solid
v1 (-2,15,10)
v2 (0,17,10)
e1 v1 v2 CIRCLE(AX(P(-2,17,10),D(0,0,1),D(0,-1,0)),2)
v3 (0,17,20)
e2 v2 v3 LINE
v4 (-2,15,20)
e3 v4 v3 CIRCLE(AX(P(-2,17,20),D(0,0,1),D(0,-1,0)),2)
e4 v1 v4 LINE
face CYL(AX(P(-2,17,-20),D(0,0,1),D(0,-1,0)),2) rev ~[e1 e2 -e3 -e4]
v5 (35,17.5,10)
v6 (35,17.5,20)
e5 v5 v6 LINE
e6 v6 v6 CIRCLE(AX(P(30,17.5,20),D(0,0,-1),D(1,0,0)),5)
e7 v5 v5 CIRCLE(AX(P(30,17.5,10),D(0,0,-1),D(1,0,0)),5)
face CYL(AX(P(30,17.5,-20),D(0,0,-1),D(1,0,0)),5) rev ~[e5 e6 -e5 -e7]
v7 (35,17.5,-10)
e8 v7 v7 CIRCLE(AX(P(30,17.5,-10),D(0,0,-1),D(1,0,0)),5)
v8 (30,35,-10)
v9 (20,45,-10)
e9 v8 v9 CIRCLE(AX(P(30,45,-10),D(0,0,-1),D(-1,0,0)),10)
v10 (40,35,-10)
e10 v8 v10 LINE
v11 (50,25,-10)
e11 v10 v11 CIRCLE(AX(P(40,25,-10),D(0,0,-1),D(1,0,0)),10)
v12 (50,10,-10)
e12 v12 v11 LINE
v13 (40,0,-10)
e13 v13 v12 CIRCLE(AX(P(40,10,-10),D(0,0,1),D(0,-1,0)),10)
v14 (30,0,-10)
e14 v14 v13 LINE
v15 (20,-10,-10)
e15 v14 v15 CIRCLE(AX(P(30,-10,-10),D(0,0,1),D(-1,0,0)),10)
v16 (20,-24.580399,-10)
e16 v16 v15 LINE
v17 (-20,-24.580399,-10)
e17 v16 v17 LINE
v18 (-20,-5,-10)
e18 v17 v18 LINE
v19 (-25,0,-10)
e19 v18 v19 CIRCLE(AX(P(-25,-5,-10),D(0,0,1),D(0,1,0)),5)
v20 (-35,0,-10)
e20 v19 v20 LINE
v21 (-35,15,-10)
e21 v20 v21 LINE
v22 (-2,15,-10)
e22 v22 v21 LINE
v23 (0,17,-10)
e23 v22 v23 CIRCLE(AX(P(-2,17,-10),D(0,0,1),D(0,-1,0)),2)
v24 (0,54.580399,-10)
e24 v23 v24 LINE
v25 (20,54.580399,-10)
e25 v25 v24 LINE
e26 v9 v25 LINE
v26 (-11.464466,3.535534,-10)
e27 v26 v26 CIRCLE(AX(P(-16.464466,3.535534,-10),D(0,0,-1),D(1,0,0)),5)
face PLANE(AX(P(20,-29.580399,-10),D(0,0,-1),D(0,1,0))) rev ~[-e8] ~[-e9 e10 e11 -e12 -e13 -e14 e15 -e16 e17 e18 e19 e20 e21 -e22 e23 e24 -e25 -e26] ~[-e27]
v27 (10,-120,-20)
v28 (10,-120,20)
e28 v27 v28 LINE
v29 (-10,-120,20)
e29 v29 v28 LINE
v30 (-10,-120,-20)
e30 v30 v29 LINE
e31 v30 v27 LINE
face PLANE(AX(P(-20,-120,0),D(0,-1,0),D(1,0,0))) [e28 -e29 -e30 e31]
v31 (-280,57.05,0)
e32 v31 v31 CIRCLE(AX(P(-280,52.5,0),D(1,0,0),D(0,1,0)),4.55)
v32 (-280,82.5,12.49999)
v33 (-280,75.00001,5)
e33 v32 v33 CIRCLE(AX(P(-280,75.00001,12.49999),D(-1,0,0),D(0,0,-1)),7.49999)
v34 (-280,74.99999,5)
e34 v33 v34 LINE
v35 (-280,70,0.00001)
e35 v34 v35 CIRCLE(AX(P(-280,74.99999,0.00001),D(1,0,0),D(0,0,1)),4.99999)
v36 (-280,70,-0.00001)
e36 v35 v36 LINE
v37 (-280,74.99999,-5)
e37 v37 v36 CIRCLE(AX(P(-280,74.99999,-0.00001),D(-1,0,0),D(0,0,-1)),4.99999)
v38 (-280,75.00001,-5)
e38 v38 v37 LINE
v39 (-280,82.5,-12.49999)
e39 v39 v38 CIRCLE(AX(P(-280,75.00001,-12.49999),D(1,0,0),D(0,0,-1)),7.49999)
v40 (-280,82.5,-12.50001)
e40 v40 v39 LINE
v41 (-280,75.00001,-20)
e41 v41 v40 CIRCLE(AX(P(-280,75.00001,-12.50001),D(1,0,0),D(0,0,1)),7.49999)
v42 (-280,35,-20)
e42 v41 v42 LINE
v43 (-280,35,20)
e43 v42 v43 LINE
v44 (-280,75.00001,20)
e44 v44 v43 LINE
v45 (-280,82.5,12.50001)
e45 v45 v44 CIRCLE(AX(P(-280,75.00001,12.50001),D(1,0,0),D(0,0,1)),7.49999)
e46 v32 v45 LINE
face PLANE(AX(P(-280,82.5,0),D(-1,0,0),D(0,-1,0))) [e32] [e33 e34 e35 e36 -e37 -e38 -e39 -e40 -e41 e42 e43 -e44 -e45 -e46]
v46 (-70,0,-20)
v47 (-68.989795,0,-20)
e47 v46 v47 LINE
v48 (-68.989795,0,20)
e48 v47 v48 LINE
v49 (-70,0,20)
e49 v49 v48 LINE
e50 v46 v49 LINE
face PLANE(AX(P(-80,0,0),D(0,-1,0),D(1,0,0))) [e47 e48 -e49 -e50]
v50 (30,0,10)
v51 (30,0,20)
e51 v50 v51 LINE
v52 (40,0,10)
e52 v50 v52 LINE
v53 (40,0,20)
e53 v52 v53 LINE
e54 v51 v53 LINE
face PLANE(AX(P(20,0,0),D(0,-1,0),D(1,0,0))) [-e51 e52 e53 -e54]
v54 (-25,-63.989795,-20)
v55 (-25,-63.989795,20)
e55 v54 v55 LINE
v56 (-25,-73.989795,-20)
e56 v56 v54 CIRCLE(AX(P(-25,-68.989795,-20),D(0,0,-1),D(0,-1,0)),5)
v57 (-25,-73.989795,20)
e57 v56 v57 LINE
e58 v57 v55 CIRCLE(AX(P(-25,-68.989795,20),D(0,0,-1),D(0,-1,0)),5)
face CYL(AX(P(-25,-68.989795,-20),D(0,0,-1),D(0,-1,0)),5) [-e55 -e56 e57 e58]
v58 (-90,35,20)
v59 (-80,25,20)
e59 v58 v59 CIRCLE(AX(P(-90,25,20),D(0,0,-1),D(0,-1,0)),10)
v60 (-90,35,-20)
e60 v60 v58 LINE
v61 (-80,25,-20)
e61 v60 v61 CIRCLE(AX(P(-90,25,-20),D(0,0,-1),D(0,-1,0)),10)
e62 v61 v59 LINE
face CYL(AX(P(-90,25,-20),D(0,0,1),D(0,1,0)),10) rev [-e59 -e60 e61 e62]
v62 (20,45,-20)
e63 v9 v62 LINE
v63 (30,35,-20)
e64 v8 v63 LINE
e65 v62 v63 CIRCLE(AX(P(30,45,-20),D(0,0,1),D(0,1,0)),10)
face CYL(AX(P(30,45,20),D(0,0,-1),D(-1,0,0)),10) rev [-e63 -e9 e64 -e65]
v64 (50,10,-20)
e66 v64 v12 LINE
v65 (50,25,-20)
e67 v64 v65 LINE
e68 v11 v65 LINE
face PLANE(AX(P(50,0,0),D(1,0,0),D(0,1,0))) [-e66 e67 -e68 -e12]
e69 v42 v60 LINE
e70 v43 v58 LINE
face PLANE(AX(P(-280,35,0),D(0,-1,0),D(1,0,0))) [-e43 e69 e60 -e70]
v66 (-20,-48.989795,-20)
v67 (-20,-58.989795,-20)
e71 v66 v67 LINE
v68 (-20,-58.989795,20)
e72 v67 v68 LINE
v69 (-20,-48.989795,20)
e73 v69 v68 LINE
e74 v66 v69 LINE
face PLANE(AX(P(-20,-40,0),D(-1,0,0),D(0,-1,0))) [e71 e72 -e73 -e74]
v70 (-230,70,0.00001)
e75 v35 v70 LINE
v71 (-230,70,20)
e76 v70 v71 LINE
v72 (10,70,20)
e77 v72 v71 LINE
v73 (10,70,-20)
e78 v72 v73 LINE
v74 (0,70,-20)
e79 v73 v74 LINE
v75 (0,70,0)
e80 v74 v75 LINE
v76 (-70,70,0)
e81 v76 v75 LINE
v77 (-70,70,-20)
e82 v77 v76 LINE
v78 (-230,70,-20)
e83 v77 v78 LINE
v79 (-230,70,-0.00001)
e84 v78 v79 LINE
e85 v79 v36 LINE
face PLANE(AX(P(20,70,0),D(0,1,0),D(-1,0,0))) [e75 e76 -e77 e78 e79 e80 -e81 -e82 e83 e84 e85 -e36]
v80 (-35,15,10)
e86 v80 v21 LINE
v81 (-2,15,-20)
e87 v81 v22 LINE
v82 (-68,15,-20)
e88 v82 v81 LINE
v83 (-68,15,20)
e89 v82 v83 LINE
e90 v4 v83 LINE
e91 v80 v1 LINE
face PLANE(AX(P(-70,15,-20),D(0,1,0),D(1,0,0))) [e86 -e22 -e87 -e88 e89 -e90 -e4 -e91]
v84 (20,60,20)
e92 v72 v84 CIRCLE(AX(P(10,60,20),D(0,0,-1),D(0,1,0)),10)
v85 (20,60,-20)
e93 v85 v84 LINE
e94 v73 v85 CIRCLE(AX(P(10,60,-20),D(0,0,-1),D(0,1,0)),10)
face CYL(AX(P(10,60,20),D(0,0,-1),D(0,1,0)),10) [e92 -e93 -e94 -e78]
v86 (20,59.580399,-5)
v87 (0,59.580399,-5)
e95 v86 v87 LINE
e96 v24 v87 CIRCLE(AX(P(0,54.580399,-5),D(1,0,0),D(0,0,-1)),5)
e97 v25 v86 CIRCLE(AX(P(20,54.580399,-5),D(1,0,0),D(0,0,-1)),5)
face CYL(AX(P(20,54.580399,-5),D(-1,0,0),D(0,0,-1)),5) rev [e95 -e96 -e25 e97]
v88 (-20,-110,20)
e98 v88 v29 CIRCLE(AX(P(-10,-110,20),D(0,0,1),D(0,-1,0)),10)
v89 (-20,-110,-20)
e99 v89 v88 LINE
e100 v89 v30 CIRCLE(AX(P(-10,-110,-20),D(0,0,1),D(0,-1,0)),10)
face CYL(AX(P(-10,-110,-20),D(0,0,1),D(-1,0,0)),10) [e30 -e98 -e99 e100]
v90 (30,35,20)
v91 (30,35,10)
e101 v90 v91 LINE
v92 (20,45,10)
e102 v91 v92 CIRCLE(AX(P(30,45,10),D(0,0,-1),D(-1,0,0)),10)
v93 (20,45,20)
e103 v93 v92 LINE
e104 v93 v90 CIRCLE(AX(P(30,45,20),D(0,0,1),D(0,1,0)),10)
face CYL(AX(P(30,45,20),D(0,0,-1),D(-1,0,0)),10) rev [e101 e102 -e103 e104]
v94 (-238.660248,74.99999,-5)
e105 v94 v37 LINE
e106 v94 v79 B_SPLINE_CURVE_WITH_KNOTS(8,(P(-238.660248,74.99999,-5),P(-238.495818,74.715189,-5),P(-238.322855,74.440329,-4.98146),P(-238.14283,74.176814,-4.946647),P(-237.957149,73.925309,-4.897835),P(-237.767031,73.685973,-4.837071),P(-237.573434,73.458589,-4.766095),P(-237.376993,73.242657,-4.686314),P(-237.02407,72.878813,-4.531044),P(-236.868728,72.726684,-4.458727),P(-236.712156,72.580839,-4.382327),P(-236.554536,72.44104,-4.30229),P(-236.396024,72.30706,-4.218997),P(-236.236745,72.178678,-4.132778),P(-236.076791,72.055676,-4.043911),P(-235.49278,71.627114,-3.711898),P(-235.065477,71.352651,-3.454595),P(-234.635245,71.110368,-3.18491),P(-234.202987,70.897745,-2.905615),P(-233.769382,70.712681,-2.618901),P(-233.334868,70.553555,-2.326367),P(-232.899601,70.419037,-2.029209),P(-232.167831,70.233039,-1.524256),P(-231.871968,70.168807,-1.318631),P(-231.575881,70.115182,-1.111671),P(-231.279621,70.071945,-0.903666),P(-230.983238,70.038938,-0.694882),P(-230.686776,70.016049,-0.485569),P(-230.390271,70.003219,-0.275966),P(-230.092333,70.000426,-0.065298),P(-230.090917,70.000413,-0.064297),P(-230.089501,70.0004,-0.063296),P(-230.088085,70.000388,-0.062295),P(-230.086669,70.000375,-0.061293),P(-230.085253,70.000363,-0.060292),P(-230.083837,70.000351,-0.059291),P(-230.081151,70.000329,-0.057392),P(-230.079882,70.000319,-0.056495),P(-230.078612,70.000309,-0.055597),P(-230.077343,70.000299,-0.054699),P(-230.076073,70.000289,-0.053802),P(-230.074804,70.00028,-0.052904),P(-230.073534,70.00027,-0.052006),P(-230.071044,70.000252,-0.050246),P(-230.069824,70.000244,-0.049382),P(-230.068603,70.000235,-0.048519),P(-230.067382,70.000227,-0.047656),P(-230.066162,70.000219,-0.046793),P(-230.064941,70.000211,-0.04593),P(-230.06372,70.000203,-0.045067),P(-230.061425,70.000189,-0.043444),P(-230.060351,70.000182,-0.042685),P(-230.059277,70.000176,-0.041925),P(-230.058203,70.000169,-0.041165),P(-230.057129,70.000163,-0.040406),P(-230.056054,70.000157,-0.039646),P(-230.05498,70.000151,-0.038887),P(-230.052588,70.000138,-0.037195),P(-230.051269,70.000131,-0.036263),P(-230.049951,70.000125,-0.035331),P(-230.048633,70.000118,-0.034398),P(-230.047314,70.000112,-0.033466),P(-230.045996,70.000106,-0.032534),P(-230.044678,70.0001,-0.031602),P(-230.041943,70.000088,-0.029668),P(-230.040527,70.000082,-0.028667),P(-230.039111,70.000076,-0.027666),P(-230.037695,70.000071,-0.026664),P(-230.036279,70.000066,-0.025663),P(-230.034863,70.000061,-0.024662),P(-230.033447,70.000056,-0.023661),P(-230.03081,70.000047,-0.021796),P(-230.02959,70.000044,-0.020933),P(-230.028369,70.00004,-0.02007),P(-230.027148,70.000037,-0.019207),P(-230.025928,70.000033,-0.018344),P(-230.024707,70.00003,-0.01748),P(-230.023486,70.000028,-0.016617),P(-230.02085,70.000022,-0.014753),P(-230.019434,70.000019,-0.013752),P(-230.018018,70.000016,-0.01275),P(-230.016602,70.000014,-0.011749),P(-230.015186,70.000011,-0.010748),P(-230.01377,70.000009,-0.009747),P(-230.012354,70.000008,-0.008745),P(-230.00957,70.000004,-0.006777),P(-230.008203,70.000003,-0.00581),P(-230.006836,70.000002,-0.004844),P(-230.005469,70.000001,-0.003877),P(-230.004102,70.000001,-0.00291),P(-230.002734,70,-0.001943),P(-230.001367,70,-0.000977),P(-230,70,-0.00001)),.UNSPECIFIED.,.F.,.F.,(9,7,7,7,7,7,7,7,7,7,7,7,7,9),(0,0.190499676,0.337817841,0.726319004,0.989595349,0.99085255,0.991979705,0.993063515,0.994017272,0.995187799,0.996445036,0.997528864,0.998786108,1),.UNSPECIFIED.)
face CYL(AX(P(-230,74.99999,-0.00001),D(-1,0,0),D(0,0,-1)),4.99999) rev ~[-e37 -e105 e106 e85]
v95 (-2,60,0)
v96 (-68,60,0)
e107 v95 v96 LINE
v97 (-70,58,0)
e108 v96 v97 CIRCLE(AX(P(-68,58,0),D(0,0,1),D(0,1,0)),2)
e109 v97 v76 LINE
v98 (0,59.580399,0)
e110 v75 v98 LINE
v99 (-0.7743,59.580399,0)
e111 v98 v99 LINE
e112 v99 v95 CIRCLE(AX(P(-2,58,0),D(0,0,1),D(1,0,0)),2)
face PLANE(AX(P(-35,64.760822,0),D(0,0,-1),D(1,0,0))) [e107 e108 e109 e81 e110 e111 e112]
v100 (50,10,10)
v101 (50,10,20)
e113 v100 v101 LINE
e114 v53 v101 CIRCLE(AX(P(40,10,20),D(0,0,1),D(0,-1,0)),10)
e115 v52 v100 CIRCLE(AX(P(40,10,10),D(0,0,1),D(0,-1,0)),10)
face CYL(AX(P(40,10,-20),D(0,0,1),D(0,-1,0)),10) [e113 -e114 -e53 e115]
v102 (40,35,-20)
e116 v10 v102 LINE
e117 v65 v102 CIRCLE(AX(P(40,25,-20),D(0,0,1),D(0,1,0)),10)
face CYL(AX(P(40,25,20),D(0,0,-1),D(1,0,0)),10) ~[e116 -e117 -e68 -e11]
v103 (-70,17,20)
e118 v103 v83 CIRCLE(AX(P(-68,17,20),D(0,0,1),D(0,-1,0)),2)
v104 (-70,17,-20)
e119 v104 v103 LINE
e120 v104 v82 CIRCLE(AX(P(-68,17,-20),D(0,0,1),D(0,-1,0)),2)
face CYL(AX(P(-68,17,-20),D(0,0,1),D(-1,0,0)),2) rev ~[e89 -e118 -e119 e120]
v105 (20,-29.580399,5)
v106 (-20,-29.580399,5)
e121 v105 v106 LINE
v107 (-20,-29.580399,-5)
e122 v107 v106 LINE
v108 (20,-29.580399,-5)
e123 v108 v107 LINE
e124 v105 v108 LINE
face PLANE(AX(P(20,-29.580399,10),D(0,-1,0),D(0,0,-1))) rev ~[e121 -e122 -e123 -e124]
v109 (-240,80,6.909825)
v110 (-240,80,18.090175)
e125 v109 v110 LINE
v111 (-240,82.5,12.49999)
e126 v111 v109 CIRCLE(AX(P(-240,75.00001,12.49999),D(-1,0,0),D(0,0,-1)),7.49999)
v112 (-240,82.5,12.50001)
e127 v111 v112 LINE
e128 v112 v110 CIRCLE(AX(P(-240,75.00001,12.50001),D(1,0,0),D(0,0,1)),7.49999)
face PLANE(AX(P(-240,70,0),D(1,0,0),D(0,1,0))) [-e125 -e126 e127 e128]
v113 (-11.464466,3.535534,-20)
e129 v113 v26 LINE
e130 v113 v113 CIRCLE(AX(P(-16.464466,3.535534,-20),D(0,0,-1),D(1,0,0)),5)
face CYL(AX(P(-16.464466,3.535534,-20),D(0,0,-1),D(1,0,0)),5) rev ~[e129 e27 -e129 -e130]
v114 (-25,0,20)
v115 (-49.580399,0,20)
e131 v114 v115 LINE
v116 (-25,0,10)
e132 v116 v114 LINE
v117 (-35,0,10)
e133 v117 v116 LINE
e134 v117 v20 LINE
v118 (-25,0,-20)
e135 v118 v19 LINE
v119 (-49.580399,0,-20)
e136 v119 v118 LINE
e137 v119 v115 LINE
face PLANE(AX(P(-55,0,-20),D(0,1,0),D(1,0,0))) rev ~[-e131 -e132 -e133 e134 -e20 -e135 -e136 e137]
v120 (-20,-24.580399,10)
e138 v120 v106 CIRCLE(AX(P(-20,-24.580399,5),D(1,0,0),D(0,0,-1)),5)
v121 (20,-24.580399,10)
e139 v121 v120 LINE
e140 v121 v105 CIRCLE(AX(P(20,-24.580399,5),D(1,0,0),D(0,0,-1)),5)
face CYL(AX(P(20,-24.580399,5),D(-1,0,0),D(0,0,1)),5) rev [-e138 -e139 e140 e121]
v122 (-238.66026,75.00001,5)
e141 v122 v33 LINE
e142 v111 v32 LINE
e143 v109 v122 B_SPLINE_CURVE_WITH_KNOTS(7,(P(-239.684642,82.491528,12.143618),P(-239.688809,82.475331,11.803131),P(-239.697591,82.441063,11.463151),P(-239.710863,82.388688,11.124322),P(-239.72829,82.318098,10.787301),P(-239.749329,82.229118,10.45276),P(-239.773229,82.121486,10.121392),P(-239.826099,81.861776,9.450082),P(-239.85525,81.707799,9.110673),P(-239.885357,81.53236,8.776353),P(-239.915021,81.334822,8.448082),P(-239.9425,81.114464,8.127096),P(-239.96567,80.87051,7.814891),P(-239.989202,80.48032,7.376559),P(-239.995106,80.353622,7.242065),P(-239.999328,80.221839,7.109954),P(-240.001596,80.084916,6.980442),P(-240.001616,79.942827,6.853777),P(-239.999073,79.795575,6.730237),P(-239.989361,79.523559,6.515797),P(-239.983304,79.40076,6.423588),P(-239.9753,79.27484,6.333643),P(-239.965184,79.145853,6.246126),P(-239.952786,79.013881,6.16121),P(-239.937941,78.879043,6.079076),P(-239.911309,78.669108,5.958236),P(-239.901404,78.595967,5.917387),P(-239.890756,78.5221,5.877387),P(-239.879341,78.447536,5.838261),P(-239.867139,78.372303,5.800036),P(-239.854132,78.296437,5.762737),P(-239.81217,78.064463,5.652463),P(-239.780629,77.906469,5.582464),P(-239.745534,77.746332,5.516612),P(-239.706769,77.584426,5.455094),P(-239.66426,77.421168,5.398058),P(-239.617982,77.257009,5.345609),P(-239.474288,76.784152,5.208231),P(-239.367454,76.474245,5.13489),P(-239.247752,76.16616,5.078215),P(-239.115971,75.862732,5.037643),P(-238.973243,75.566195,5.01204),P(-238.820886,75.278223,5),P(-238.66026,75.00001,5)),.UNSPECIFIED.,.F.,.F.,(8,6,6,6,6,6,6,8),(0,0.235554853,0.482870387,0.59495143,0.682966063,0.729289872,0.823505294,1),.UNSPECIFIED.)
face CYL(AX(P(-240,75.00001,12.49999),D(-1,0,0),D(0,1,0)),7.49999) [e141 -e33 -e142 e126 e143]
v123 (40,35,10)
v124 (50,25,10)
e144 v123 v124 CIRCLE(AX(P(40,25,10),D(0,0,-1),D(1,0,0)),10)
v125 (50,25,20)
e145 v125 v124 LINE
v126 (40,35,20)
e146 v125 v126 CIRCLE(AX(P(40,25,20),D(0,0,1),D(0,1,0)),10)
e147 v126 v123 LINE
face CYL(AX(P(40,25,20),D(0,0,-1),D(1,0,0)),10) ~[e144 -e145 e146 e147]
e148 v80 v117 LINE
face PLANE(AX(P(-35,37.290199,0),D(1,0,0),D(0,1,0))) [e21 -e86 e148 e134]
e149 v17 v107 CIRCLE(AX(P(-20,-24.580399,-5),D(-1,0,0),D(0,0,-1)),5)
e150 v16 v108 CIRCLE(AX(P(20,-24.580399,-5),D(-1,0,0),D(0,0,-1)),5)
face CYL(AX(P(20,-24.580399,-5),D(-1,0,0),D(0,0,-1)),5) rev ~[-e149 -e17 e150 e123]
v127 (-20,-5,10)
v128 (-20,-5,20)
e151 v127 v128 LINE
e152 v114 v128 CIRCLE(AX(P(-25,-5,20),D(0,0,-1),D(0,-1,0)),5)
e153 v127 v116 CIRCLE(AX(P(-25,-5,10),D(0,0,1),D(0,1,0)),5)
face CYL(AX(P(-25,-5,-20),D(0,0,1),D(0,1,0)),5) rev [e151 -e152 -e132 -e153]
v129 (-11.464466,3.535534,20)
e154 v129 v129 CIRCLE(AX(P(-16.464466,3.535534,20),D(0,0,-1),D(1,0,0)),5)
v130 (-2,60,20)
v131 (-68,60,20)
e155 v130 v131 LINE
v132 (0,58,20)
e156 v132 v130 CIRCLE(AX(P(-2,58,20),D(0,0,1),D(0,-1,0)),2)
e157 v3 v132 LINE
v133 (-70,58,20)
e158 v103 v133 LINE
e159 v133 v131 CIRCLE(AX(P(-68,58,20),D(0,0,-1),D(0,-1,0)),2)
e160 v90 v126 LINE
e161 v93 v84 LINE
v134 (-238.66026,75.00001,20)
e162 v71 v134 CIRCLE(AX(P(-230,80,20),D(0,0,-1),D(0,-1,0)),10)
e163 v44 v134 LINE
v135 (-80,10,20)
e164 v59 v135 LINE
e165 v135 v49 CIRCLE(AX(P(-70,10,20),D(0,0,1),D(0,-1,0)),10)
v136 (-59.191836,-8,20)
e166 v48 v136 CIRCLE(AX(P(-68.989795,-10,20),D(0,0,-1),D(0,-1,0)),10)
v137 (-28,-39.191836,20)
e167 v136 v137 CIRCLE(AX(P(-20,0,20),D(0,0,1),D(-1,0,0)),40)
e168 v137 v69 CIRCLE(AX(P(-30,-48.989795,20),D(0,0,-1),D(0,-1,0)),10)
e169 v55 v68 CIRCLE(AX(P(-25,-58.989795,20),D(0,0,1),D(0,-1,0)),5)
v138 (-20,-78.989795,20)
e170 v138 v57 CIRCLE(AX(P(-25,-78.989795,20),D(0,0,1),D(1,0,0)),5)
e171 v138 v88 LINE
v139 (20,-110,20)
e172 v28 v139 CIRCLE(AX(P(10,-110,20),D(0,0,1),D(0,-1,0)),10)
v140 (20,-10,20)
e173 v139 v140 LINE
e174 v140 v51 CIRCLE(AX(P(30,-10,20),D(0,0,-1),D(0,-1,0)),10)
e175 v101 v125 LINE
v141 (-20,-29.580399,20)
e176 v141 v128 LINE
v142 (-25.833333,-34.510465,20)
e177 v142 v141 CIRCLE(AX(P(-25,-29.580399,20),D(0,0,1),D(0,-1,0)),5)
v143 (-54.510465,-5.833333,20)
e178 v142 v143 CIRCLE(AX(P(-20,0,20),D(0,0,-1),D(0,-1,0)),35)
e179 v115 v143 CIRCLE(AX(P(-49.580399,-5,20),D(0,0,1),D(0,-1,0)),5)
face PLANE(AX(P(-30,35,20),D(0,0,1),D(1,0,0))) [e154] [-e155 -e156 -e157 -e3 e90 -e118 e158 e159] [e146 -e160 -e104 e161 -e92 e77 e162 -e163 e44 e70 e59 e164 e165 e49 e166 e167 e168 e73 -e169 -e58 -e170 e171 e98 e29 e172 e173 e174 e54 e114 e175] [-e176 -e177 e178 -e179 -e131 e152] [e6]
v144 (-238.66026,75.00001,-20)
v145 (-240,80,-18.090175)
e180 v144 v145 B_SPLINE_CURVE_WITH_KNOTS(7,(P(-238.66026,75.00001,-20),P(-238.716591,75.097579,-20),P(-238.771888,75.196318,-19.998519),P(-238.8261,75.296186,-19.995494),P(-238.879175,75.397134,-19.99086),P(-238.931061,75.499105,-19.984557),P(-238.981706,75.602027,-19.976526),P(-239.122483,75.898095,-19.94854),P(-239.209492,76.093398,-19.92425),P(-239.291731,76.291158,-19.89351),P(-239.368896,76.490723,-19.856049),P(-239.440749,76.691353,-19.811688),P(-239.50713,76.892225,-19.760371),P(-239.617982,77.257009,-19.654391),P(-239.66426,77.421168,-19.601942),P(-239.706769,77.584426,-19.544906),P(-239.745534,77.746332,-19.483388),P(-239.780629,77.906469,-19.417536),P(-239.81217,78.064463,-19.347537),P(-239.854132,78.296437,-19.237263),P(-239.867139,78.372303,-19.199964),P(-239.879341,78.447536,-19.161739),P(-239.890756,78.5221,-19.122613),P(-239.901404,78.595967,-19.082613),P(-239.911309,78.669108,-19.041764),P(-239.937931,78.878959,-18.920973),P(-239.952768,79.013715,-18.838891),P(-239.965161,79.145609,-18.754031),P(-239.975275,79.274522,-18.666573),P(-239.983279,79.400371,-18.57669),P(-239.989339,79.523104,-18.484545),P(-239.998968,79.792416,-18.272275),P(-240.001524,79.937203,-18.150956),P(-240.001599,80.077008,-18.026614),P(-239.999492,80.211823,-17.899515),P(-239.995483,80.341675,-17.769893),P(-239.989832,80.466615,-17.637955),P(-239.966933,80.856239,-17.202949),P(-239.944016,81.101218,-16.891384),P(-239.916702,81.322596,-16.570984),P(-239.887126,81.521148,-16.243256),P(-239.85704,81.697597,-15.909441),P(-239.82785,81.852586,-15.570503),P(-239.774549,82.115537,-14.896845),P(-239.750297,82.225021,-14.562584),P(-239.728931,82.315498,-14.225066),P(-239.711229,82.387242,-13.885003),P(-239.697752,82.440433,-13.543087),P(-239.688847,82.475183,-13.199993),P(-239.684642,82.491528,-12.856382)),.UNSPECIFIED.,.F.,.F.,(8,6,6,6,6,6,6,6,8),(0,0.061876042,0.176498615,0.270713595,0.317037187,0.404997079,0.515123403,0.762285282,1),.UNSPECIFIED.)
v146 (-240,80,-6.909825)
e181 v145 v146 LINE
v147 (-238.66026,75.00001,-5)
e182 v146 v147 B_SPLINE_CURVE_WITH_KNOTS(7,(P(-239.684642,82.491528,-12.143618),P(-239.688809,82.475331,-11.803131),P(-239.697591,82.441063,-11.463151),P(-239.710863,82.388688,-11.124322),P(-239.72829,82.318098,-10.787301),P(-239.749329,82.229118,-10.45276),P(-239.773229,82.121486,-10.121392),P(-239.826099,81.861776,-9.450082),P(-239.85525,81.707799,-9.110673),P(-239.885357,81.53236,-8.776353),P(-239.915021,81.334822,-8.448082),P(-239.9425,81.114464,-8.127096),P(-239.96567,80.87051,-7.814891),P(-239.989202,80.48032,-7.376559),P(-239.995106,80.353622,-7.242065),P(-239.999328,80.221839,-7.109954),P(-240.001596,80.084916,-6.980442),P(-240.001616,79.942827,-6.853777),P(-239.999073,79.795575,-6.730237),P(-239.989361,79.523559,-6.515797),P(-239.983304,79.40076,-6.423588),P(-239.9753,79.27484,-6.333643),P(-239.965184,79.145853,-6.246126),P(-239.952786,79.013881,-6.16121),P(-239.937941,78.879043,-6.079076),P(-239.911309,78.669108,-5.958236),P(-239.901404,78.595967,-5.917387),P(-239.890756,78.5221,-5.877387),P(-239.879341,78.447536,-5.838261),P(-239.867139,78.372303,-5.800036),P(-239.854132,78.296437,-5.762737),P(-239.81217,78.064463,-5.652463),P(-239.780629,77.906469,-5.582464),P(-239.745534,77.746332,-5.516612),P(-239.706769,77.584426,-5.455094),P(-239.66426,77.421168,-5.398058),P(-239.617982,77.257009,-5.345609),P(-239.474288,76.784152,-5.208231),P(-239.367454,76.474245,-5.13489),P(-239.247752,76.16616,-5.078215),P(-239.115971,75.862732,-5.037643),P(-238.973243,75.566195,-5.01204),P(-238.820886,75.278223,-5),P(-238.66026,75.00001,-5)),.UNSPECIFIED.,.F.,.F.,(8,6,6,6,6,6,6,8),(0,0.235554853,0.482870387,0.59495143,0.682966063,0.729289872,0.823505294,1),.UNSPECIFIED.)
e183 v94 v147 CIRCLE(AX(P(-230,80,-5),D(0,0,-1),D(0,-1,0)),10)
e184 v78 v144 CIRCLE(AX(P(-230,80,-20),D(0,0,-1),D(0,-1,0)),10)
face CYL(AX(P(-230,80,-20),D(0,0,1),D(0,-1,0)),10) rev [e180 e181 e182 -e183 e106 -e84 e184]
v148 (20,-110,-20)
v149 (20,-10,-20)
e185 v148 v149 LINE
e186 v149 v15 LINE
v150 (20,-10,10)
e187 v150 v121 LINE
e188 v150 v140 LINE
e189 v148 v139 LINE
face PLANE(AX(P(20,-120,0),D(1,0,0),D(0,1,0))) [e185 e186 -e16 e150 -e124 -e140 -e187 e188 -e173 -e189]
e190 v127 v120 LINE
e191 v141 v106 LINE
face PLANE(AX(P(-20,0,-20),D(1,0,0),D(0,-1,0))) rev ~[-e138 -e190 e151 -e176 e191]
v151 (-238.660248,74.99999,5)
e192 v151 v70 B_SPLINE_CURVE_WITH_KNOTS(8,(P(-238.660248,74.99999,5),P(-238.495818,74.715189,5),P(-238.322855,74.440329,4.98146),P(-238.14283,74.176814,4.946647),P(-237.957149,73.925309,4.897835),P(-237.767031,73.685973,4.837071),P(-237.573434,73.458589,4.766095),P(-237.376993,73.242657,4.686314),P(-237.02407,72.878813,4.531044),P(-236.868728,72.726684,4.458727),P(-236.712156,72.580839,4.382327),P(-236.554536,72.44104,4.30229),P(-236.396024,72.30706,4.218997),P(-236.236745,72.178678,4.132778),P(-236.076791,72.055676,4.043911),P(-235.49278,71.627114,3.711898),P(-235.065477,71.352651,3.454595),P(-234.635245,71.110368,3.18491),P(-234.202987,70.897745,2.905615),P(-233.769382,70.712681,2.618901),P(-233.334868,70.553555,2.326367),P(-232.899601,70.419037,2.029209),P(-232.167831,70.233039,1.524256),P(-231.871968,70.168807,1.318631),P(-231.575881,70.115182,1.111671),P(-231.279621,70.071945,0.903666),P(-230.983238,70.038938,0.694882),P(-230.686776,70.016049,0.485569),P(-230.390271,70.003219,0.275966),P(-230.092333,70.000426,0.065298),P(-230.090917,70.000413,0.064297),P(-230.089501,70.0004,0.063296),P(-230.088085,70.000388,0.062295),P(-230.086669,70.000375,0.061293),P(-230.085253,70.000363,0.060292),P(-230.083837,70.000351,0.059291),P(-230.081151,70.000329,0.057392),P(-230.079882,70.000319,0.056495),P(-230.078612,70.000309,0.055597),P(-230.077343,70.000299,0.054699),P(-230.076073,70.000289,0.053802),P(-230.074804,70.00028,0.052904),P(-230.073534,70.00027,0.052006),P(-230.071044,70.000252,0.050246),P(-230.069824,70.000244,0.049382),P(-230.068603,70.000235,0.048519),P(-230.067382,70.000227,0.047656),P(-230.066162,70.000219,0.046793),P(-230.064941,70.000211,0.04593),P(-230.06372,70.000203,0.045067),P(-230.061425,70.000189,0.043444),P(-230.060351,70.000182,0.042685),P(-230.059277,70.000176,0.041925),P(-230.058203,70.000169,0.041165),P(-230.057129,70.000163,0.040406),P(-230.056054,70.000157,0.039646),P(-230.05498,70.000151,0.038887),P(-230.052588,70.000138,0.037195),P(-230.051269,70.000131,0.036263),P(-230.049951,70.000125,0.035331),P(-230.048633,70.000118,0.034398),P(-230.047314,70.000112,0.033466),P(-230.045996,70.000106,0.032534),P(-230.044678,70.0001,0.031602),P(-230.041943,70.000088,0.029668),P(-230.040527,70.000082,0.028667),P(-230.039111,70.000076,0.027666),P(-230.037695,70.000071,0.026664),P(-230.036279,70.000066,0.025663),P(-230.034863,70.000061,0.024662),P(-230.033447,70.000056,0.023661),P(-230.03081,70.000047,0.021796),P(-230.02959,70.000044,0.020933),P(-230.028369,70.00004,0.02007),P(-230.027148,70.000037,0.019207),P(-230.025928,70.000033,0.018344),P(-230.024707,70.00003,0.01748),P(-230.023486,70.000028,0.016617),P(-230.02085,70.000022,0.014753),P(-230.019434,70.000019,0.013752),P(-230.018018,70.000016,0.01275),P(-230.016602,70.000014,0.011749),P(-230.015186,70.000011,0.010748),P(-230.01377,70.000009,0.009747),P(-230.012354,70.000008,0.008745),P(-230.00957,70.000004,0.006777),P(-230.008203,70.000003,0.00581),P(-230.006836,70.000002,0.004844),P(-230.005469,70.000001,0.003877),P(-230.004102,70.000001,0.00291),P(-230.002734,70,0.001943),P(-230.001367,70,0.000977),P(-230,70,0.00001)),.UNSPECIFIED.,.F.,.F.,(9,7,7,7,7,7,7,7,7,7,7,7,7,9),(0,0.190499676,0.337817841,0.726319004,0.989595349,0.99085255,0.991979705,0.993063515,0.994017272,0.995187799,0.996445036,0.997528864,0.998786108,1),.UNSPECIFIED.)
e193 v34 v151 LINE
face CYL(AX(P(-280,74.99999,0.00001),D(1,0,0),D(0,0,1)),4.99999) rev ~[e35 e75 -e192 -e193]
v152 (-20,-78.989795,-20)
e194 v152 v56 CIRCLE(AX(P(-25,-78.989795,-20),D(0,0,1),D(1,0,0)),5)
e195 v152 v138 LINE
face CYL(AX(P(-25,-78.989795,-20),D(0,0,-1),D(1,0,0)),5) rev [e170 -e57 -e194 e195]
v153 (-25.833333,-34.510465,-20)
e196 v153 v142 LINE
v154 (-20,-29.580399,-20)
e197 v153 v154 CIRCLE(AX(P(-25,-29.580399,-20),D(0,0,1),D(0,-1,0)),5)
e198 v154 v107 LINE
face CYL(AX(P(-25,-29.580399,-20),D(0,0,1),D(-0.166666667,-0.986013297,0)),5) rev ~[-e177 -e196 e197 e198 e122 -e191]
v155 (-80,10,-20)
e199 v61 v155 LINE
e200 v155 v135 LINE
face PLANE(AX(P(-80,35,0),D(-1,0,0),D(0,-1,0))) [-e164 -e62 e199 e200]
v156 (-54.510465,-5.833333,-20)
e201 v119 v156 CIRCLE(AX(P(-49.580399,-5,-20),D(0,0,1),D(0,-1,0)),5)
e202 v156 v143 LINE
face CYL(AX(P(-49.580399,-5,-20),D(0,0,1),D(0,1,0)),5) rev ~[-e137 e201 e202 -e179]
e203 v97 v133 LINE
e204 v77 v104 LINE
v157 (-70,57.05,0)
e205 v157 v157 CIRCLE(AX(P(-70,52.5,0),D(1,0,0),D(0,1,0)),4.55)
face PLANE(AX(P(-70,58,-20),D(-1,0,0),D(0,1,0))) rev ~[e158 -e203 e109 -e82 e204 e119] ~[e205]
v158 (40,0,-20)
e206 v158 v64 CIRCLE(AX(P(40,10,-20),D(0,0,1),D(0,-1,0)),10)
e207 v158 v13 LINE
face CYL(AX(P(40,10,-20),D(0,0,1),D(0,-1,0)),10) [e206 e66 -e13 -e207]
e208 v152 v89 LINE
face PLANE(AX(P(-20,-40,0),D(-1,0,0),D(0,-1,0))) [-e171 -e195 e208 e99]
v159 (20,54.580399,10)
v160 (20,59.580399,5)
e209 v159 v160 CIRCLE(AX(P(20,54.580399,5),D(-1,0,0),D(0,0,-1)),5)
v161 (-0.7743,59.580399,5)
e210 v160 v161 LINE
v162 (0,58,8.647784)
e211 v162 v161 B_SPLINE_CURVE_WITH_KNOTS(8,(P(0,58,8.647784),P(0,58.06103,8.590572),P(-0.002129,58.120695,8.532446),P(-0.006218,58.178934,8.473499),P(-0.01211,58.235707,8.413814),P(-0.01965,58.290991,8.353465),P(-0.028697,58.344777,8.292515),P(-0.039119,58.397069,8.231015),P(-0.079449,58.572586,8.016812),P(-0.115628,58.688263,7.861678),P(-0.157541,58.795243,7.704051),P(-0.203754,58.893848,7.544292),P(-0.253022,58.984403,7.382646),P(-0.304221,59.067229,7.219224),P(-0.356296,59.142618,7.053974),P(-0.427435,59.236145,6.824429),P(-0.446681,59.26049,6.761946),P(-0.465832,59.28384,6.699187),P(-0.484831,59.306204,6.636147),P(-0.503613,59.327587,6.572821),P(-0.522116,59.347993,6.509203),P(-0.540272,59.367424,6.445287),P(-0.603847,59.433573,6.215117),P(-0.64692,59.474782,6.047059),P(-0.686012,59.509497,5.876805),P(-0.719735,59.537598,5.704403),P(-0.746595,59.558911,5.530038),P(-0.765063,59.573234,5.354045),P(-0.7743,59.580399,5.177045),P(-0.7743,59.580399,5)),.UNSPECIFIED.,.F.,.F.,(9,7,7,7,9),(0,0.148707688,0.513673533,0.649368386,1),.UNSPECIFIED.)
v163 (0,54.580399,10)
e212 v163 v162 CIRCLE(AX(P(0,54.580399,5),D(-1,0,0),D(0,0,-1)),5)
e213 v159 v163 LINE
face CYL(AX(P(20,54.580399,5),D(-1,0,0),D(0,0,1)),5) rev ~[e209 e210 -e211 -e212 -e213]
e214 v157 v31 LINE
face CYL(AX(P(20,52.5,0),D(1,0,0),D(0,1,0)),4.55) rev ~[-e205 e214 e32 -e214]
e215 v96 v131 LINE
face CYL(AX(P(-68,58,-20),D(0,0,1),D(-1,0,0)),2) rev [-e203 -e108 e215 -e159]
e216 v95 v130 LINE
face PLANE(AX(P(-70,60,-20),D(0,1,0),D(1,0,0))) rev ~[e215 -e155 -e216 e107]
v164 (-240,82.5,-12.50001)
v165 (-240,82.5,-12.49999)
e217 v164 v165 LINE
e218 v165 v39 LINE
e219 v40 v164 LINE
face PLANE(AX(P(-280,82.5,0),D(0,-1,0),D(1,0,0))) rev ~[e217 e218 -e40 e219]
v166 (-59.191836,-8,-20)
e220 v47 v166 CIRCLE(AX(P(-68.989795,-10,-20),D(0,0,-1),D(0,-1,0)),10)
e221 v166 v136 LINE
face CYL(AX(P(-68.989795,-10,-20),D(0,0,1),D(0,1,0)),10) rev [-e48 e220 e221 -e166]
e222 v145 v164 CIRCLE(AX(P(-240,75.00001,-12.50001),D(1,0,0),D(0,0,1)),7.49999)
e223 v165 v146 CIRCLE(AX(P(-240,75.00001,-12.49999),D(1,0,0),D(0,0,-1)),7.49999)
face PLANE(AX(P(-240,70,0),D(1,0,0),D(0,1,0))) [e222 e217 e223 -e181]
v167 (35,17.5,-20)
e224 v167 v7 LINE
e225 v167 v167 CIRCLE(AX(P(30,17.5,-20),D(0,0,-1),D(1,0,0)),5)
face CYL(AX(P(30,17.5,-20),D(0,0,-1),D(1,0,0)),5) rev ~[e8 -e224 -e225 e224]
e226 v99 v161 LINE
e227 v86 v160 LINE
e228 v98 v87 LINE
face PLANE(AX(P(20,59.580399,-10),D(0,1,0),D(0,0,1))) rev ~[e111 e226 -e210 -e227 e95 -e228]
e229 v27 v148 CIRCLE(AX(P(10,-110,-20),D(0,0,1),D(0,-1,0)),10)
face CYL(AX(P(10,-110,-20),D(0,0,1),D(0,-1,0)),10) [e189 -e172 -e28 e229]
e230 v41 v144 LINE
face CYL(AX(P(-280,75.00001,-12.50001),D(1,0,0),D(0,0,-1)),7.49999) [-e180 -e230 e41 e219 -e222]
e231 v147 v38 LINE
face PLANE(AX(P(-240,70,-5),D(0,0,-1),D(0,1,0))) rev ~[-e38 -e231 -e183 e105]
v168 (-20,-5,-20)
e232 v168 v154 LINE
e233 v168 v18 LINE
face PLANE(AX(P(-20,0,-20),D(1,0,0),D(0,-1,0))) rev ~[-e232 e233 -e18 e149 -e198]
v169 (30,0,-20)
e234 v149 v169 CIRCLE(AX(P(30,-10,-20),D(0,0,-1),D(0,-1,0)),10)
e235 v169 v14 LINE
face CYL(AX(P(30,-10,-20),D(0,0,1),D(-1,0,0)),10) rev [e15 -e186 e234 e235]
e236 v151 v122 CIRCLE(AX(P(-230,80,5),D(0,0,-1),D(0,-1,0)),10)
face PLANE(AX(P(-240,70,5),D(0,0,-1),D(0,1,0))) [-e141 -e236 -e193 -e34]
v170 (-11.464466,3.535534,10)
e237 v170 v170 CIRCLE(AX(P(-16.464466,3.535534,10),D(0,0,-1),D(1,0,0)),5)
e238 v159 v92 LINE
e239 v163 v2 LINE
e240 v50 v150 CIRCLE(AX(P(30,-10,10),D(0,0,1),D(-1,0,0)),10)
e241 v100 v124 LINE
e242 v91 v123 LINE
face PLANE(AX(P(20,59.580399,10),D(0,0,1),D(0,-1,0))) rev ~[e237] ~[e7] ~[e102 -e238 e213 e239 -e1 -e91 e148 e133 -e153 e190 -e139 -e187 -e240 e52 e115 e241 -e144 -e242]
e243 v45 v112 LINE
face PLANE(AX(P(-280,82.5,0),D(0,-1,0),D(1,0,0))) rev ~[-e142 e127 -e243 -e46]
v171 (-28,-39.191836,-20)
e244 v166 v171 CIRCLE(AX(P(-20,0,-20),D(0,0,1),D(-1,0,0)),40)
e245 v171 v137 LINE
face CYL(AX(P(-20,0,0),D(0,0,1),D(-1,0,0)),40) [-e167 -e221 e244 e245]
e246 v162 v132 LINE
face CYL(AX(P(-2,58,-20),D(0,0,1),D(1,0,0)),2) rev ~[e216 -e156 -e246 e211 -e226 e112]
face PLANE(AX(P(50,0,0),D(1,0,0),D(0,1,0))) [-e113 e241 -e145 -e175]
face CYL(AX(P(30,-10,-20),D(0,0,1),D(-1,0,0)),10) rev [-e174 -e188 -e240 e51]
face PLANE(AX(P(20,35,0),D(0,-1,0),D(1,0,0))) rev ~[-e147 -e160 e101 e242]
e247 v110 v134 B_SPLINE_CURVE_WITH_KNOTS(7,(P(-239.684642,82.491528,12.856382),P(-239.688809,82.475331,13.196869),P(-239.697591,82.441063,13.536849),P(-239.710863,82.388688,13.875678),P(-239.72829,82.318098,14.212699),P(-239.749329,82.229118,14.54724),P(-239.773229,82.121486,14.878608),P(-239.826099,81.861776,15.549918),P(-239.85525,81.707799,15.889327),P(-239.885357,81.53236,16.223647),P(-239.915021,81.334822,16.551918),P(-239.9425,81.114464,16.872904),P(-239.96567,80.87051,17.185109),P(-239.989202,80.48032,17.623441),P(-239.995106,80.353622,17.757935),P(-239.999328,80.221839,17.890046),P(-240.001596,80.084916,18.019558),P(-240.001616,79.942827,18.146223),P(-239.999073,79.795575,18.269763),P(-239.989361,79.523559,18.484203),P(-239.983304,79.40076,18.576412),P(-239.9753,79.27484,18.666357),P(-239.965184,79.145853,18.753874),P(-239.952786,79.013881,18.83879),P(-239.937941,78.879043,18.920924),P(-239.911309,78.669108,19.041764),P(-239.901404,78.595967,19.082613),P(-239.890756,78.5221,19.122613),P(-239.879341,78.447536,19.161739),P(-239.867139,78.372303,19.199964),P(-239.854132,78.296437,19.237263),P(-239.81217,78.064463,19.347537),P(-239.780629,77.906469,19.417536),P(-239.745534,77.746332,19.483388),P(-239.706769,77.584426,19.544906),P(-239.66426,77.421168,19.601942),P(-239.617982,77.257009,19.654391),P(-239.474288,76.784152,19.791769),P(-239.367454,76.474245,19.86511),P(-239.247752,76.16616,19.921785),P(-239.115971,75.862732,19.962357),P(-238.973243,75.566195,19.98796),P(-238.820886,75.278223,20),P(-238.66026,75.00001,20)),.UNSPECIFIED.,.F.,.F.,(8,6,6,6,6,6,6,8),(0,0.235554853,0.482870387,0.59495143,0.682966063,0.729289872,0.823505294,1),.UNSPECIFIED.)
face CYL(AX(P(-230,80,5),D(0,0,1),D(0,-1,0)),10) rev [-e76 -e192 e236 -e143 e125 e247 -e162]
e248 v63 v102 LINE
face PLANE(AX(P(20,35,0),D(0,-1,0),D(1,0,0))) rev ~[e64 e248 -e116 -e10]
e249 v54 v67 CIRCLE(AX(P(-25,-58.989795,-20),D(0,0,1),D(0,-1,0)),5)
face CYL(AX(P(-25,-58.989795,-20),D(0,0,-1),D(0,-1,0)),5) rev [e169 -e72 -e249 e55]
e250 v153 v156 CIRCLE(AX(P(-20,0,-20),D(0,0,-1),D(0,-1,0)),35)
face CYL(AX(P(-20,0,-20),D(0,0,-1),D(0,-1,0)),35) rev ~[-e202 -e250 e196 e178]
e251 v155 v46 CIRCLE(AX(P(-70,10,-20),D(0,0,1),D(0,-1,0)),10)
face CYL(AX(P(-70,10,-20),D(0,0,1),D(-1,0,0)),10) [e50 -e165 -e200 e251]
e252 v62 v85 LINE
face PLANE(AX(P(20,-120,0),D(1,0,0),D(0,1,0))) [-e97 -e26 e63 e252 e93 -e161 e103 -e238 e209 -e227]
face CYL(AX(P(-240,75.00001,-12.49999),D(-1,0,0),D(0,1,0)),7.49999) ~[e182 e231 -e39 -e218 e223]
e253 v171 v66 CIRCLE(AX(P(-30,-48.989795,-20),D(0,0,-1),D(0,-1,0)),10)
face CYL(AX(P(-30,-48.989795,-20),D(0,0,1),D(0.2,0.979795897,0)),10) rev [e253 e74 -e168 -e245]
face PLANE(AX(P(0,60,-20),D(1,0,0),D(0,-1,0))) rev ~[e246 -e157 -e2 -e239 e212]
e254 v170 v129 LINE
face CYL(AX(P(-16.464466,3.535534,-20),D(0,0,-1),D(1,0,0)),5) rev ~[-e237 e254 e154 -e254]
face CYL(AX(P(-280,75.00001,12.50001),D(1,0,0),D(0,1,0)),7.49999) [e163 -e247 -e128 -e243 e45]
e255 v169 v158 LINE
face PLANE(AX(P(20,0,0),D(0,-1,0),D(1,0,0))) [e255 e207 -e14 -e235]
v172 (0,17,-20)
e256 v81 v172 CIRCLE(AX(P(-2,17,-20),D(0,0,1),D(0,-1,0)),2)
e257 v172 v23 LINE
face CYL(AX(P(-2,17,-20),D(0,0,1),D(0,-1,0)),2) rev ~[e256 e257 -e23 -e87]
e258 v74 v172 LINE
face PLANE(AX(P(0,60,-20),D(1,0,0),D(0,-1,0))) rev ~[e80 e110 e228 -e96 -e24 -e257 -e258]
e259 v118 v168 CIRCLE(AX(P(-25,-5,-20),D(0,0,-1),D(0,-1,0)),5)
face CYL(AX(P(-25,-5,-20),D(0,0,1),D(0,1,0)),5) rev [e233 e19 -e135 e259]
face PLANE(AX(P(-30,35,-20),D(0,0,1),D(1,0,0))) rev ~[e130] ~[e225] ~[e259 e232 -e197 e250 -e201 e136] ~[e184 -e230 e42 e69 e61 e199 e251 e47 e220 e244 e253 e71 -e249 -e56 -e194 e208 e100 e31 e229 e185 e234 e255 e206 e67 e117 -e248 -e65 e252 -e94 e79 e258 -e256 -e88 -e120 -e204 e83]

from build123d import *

# Parameters (mm, degrees)
F0_W      = 30
F0_H      = 35
F0_W_2    = 40
F0_H_2    = 12.5
F1_DEPTH  = 20
F2_R      = 4.55
F3_DEPTH  = 300.001
F4_W      = 12.5
F4_H      = 10
F5_DEPTH  = 40.001
F6_R      = 10
F8_DEPTH  = 40.001
F9_R      = 5
F11_DEPTH = 40
F12_W     = 50
F12_H     = 20
F13_DEPTH = 190.001
F14_W     = 70
F14_H     = 45
F15_DEPTH = 40.001
F16_R     = 2
F17_R     = 4.55
F18_DEPTH = 55
F19_R     = 5
F20_R     = 5
F21_DEPTH = 40.0010001
F22_R     = 5
F23_DEPTH = 40.0010001
F25_DEPTH = 20
F26_R     = 4.99999
F27_R     = 7.49999


# Not quite as in the source:
# - a fillet or chamfer is up to 0.001 mm smaller than in the source, because OpenCascade refuses the exact size


with BuildPart() as f1:
    # F0 (on Top) → F1 (new body, symmetric)
    with BuildSketch(Plane.XY):
        Polygon((-60, 0), (-20, 0), (20, 0), (20, 35), (20, 70), (-80, 70), (-80, 35), (-80, 0), align=None)
        Polygon((20, 0), (-20, 0), (-20, -40), (-20, -120), (20, -120), align=None)
        with BuildLine():
            Line((-20, -40), (-20, 0))
            Line((-20, 0), (-60, 0))
            ThreePointArc((-60, 0), (-48.2842712475, -28.2842712475), (-20, -40))
        make_face()
        with Locations((35, 17.5)):
            Rectangle(F0_W, F0_H)
        Polygon((-280, 35), (-80, 35), (-80, 70), (-240, 70), (-280, 70), align=None)
        with Locations((-260, 76.25)):
            Rectangle(F0_W_2, F0_H_2)
    extrude(amount=F1_DEPTH, both=True)

    # F2 (on face) → F3 (cut, through all)
    with BuildSketch(Plane.YZ.offset(20)):
        with Locations((52.5, 0)):
            Circle(F2_R)
    extrude(amount=-F3_DEPTH, mode=Mode.SUBTRACT)

    # F4 (on face) → F5 (cut, through all)
    with BuildSketch(Plane.YZ.offset(-240)):
        with Locations((76.25, 0)):
            Rectangle(F4_W, F4_H)
    extrude(amount=-F5_DEPTH, mode=Mode.SUBTRACT)

    # F6
    f6_edges = [f1.edges().sort_by_distance(p)[0] for p in [
        (-60, 0, 0),
        (-20, -40, 0),
        (-80, 0, 0),
        (-80, 35, 0),
        (20, 0, 0),
        (20, 35, 0),
        (50, 35, 0),
        (50, 0, 0),
        (20, 70, 0),
        (20, -120, 0),
        (-20, -120, 0),
        (-240, 70, 12.5),
        (-240, 70, -12.5),
    ]]
    fillet(f6_edges, radius=F6_R)

    # F7 (on face) → F8 (cut, through all)
    with BuildSketch(Plane(origin=(0, 0, -20), x_dir=(1, 0, 0), z_dir=(0, 0, -1))):
        with BuildLine():
            Line((-20, 0), (-20, 35))
            ThreePointArc((-20, 35), (-44.7487373415, 24.7487373415), (-55, 0))
            Line((-55, 0), (-20, 0))
        make_face()
    extrude(amount=-F8_DEPTH, mode=Mode.SUBTRACT)

    # F9
    f9_edges = [f1.edges().sort_by_distance(p)[0] for p in [
        (-55, 0, 0),
        (-20, -35, 0),
        (-20, 0, 0),
    ]]
    fillet(f9_edges, radius=F9_R)

    # F10 (on face) → F11 (join, through all)
    with BuildSketch(Plane(origin=(0, 0, -20), x_dir=(1, 0, 0), z_dir=(0, 0, -1))):
        with BuildLine():
            ThreePointArc((-25, 63.9897948557), (-21.4644660941, 62.5253287616), (-20, 58.9897948557))
            Line((-20, 58.9897948557), (-20, 78.9897948557))
            ThreePointArc((-20, 78.9897948557), (-21.4644660941, 75.4542609497), (-25, 73.9897948557))
            ThreePointArc((-25, 73.9897948557), (-30, 68.9897948557), (-25, 63.9897948557))
        make_face()
    extrude(amount=-F11_DEPTH)

    # F12 (on face) → F13 (cut, through all)
    with BuildSketch(Plane(origin=(0, 70, 0), x_dir=(-1, 0, 0), z_dir=(0, 1, 0))):
        with Locations((-45, 0)):
            Rectangle(F12_W, F12_H)
    extrude(amount=-F13_DEPTH, mode=Mode.SUBTRACT)

    # F14 (on face) → F15 (cut, through all)
    with BuildSketch(Plane(origin=(0, 0, -20), x_dir=(1, 0, 0), z_dir=(0, 0, -1))):
        with Locations((-35, -37.5)):
            Rectangle(F14_W, F14_H)
    extrude(amount=-F15_DEPTH, mode=Mode.SUBTRACT)

    # F16
    f16_edges = [f1.edges().sort_by_distance(p)[0] for p in [
        (0, 60, 0),
        (0, 15, 0),
        (-70, 60, 0),
        (-70, 15, 0),
    ]]
    fillet(f16_edges, radius=F16_R)

    # F17 (on face) → F18 (cut)
    with BuildSketch(Plane.YZ.offset(20)):
        Polygon((45, 10), (15, 10), (15, -10), (45, -10), (59.5803989155, -10), (59.5803989155, 10), align=None)
        with Locations((52.5, 0)):
            Circle(F17_R, mode=Mode.SUBTRACT)
        Polygon((-10, 10), (-29.5803989155, 10), (-29.5803989155, -10), (-10, -10), (15, -10), (15, 10), align=None)
    extrude(amount=-F18_DEPTH, mode=Mode.SUBTRACT)

    # F19
    f19_edges = [f1.edges().sort_by_distance(p)[0] for p in [
        (0, -29.580399, 10),
        (0, -29.580399, -10),
        (9.61285, 59.580399, 10),
        (9.61285, 59.580399, -10),
    ]]
    fillet(f19_edges, radius=F19_R)

    # F20 (on face) → F21 (cut, through all)
    with BuildSketch(Plane(origin=(0, 0, -20), x_dir=(1, 0, 0), z_dir=(0, 0, -1))):
        with Locations((30, -17.5)):
            Circle(F20_R)
    extrude(amount=-F21_DEPTH, mode=Mode.SUBTRACT)

    # F22 (on face) → F23 (cut, through all)
    with BuildSketch(Plane(origin=(0, 0, -20), x_dir=(1, 0, 0), z_dir=(0, 0, -1))):
        with Locations((-16.4644660941, -3.5355339059)):
            Circle(F22_R)
    extrude(amount=-F23_DEPTH, mode=Mode.SUBTRACT)

    # F24 (on face) → F25 (cut, through all)
    with BuildSketch(Plane(origin=(0, 0, -20), x_dir=(1, 0, 0), z_dir=(0, 0, -1))):
        with BuildLine():
            ThreePointArc((-68, -60), (-69.4142135624, -59.4142135624), (-70, -58))
            Line((-70, -58), (-70, -70))
            Line((-70, -70), (0, -70))
            Line((0, -70), (0, -58))
            ThreePointArc((0, -58), (-0.5857864376, -59.4142135624), (-2, -60))
            Line((-2, -60), (-68, -60))
        make_face()
    extrude(amount=-F25_DEPTH, mode=Mode.SUBTRACT)

    # F26 (radius 5 in the source; OpenCascade refuses exactly that, so slightly less here)
    f26_edges = [f1.edges().sort_by_distance(p)[0] for p in [
        (-255, 70, -5),
        (-255, 70, 5),
    ]]
    fillet(f26_edges, radius=F26_R)

    # F27 (radius 7.5 in the source; OpenCascade refuses exactly that, so slightly less here)
    f27_edges = [f1.edges().sort_by_distance(p)[0] for p in [
        (-260, 82.5, -5),
        (-260, 82.5, -20),
        (-260, 82.5, 5),
        (-260, 82.5, 20),
    ]]
    fillet(f27_edges, radius=F27_R)


solid = f1.part
